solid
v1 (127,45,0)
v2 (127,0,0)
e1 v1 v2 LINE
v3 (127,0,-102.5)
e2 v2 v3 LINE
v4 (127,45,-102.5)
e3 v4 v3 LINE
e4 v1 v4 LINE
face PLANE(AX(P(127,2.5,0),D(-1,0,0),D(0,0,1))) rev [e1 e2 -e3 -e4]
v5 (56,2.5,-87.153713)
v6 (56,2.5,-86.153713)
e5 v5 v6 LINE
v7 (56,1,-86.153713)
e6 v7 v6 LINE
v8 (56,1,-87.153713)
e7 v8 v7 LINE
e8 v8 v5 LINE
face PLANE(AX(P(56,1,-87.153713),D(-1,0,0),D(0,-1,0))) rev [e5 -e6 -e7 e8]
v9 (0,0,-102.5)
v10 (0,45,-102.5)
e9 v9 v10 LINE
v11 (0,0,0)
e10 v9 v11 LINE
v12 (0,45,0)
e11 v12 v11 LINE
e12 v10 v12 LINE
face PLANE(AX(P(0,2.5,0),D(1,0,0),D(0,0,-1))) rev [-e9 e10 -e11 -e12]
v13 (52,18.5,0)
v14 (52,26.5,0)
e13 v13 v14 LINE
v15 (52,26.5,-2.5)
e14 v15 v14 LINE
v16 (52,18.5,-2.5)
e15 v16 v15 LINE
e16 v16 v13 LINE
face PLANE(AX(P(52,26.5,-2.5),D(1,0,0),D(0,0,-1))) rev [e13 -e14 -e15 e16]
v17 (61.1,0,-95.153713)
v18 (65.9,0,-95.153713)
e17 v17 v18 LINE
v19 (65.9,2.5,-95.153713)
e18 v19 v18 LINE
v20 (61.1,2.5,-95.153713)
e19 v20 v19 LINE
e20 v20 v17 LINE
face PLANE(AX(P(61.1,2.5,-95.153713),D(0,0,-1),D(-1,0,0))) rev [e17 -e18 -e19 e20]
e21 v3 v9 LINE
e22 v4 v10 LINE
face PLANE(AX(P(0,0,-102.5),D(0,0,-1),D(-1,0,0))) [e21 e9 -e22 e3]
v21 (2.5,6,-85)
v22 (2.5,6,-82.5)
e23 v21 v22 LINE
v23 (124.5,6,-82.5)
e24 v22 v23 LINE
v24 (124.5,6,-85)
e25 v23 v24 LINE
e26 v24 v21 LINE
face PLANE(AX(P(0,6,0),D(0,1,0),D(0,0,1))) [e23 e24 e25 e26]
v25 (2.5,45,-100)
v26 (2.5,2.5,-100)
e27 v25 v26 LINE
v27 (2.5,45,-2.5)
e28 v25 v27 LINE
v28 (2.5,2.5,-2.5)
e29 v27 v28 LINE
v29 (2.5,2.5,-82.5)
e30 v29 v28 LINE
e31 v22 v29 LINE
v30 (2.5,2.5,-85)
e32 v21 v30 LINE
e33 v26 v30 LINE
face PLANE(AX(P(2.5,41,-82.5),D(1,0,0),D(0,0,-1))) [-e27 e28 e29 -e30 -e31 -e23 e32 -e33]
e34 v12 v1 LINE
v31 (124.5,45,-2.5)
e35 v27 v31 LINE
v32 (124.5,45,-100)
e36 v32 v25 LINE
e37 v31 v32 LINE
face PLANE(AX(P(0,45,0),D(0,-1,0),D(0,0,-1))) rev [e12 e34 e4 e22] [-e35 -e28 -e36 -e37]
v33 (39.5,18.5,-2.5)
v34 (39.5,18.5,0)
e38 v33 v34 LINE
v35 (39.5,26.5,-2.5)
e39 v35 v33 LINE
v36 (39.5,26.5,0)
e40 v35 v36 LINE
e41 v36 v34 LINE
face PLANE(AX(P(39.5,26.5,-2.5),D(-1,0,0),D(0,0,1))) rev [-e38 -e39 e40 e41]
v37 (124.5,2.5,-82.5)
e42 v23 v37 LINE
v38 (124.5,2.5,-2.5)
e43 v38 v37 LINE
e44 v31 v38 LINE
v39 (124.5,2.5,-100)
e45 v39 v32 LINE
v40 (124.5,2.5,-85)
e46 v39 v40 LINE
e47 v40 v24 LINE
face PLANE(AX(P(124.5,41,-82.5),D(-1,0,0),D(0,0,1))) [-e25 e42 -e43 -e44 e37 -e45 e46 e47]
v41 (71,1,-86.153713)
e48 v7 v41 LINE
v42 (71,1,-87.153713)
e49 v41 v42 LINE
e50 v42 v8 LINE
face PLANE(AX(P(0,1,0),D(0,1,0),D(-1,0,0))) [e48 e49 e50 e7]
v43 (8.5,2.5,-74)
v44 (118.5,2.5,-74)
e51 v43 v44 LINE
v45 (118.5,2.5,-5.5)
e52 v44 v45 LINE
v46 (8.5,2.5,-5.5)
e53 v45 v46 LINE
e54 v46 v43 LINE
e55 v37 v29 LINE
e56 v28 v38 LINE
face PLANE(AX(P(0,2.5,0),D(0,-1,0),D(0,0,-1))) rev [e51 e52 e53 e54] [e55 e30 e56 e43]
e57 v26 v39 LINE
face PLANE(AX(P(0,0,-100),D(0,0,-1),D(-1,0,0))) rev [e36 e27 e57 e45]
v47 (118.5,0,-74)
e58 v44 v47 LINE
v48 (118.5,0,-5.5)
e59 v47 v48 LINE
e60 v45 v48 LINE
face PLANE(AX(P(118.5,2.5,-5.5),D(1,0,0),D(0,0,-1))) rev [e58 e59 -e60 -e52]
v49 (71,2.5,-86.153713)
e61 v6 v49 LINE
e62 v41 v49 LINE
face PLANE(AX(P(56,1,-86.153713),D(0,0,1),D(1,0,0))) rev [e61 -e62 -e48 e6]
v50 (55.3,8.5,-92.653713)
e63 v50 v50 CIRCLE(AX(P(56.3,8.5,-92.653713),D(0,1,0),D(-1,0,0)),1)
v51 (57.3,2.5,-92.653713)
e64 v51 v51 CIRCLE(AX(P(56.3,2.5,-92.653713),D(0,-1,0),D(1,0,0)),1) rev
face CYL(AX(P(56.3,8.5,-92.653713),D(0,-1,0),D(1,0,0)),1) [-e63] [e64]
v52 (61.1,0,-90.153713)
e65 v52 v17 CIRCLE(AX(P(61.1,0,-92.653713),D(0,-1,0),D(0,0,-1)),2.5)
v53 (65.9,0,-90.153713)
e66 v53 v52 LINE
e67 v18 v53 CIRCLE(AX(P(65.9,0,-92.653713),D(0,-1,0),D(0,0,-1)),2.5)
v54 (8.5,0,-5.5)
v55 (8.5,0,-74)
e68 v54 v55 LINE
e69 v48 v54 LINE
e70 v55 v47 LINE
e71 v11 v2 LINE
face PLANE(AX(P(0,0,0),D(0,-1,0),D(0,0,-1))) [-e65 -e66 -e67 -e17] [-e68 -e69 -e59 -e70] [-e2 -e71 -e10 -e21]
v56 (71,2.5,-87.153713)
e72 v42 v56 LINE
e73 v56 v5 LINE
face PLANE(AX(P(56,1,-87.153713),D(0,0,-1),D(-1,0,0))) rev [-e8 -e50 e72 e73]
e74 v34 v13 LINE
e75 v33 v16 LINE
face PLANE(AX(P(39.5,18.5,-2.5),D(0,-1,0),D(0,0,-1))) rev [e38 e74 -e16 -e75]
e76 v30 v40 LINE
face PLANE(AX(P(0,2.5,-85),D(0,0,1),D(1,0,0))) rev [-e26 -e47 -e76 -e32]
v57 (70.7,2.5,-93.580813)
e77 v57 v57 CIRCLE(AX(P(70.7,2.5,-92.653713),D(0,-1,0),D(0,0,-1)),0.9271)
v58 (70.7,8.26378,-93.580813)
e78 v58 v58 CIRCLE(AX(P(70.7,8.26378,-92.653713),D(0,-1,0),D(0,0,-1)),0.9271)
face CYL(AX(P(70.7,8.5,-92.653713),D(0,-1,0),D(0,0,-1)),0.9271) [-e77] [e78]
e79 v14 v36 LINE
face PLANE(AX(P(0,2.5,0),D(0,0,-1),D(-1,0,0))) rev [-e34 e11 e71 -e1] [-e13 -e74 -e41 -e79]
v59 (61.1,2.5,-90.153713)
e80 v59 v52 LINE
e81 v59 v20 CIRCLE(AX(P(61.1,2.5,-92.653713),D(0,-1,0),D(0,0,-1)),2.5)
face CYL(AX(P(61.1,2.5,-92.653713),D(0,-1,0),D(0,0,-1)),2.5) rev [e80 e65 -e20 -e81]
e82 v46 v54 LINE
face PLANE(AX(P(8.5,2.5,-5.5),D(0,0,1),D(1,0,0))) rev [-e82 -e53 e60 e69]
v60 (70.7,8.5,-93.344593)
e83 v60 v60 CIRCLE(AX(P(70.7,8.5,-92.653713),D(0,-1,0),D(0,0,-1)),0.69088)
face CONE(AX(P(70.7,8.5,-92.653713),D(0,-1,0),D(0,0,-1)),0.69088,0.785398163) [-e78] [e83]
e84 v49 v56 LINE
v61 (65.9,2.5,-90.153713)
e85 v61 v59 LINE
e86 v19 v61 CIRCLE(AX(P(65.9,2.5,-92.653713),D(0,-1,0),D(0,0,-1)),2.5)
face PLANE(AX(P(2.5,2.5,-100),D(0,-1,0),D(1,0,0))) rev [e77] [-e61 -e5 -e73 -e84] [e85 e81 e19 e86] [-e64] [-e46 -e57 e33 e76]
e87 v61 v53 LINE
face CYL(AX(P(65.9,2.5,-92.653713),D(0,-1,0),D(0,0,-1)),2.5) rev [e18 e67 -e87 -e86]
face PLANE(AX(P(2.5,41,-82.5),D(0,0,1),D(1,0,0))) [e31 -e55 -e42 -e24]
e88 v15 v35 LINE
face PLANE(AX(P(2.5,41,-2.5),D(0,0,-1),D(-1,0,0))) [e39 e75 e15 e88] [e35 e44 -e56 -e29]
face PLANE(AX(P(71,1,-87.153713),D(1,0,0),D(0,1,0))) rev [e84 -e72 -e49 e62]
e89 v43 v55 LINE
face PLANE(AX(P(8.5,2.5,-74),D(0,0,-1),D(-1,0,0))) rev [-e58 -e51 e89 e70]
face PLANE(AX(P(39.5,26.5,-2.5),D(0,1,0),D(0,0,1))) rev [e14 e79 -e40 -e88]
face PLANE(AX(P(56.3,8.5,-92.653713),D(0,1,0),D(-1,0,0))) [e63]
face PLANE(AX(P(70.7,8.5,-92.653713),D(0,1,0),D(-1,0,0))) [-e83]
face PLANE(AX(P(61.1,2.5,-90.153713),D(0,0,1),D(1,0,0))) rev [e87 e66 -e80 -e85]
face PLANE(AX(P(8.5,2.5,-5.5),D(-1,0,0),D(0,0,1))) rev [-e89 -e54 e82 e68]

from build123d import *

# Parameters (mm, degrees)
SKETCH1_W           = 127
SKETCH1_H           = 85
BOSS_EXTRUDE1_DEPTH = 2.5
SKETCH2_W           = 127
SKETCH2_H           = 85
SKETCH2_W_2         = 122
SKETCH2_H_2         = 80
BOSS_EXTRUDE2_DEPTH = 38.5
SKETCH3_W           = 110
SKETCH3_H           = 68.5
CUT_EXTRUDE1_DEPTH  = 2.5
BOSS_EXTRUDE3_DEPTH = 15
SKETCH10_W          = 122
SKETCH10_H          = 2.5
CUT_EXTRUDE2_DEPTH  = 35
SKETCH11_W          = 127
SKETCH11_H          = 41
BOSS_EXTRUDE4_DEPTH = 2.5
CUT_EXTRUDE4_DEPTH  = 2.5
SKETCH14_W          = 15
SKETCH14_H          = 1
CUT_EXTRUDE5_DEPTH  = 1.5
SKETCH13_R          = 1
BOSS_EXTRUDE6_DEPTH = 6
SKETCH17_W          = 12.5
SKETCH17_H          = 8
CUT_EXTRUDE6_DEPTH  = 2.5
SKETCH19_W          = 127
SKETCH19_H          = 102.5
SKETCH19_W_2        = 122
SKETCH19_H_2        = 97.5
BOSS_EXTRUDE7_DEPTH = 4


# Read off the part's stored shape, not the designer's step: #1-64 Machine Threads Stud1
with BuildPart() as part:
    # Sketch1 → Boss-Extrude1 (new body)
    with BuildSketch(Plane(origin=(0, 0, 0), x_dir=(1, 0, 0), z_dir=(0, 1, 0))):
        with Locations((63.5, 42.5)):
            Rectangle(SKETCH1_W, SKETCH1_H)
    extrude(amount=BOSS_EXTRUDE1_DEPTH)

    # Sketch2 → Boss-Extrude2 (add)
    with BuildSketch(Plane(origin=(0, 2.5, 0), x_dir=(1, 0, 0), z_dir=(0, 1, 0))):
        with Locations((63.5, 42.5)):
            Rectangle(SKETCH2_W, SKETCH2_H)
        with Locations((63.5, 42.5)):
            Rectangle(SKETCH2_W_2, SKETCH2_H_2, mode=Mode.SUBTRACT)
    extrude(amount=BOSS_EXTRUDE2_DEPTH)

    # Sketch3 → Cut-Extrude1 (cut)
    with BuildSketch(Plane(origin=(0, 0, 0), x_dir=(-1, 0, 0), z_dir=(0, -1, 0))):
        with Locations((-63.5, 39.75)):
            Rectangle(SKETCH3_W, SKETCH3_H)
    extrude(amount=-CUT_EXTRUDE1_DEPTH, mode=Mode.SUBTRACT)

    # Sketch9 → Boss-Extrude3 (add)
    with BuildSketch(Plane(origin=(0, 0, -85), x_dir=(-1, 0, 0), z_dir=(0, 0, -1))):
        Polygon((-127, 0), (0, 0), (0, 2.5), (0, 41), (-2.5, 41), (-2.5, 2.5), (-124.5, 2.5), (-124.5, 41), (-127, 41), (-127, 2.5), align=None)
    extrude(amount=BOSS_EXTRUDE3_DEPTH)

    # Sketch10 → Cut-Extrude2 (cut)
    with BuildSketch(Plane(origin=(0, 41, 0), x_dir=(1, 0, 0), z_dir=(0, 1, 0))):
        with Locations((63.5, 83.75)):
            Rectangle(SKETCH10_W, SKETCH10_H)
    extrude(amount=-CUT_EXTRUDE2_DEPTH, mode=Mode.SUBTRACT)

    # Sketch11 → Boss-Extrude4 (add)
    with BuildSketch(Plane(origin=(0, 0, -100), x_dir=(-1, 0, 0), z_dir=(0, 0, -1))):
        with Locations((-63.5, 20.5)):
            Rectangle(SKETCH11_W, SKETCH11_H)
    extrude(amount=BOSS_EXTRUDE4_DEPTH)

    # Sketch6 → Cut-Extrude4 (cut)
    with BuildSketch(Plane(origin=(0, 0, 0), x_dir=(-1, 0, 0), z_dir=(0, -1, 0))):
        with BuildLine():
            Line((-61.1, 90.153713072), (-65.9, 90.153713072))
            ThreePointArc((-65.9, 90.153713072), (-68.4, 92.653713072), (-65.9, 95.153713072))
            Line((-65.9, 95.153713072), (-61.1, 95.153713072))
            ThreePointArc((-61.1, 95.153713072), (-58.6, 92.653713072), (-61.1, 90.153713072))
        make_face()
    extrude(amount=-CUT_EXTRUDE4_DEPTH, mode=Mode.SUBTRACT)

    # Sketch14 → Cut-Extrude5 (cut)
    with BuildSketch(Plane(origin=(0, 2.5, 0), x_dir=(1, 0, 0), z_dir=(0, 1, 0))):
        with Locations((63.5, 86.653713072)):
            Rectangle(SKETCH14_W, SKETCH14_H)
    extrude(amount=-CUT_EXTRUDE5_DEPTH, mode=Mode.SUBTRACT)

    # Sketch13 → Boss-Extrude6 (add)
    with BuildSketch(Plane(origin=(0, 2.5, 0), x_dir=(1, 0, 0), z_dir=(0, 1, 0))):
        with Locations((56.3, 92.653713072)):
            Circle(SKETCH13_R)
        with Locations((70.7, 92.653713072)):
            Circle(SKETCH13_R)
    extrude(amount=BOSS_EXTRUDE6_DEPTH)

    # Sketch17 → Cut-Extrude6 (cut)
    with BuildSketch(Plane.XY):
        with Locations((45.75, 22.5)):
            Rectangle(SKETCH17_W, SKETCH17_H)
    extrude(amount=-CUT_EXTRUDE6_DEPTH, mode=Mode.SUBTRACT)

    # Sketch19 → Boss-Extrude7 (add)
    with BuildSketch(Plane(origin=(0, 41, 0), x_dir=(1, 0, 0), z_dir=(0, 1, 0))):
        with Locations((63.5, 51.25)):
            Rectangle(SKETCH19_W, SKETCH19_H)
        with Locations((63.5, 51.25)):
            Rectangle(SKETCH19_W_2, SKETCH19_H_2, mode=Mode.SUBTRACT)
    extrude(amount=BOSS_EXTRUDE7_DEPTH)

    # #1-64 Machine Threads Stud1 outline → #1-64 Machine Threads Stud1 (revolve, cut)
    with BuildSketch(Plane(origin=(70.7, 0, -92.653713072), x_dir=(1, 0, 0), z_dir=(0, 0, 1))):
        Polygon((1, 8.5), (0.69088, 8.5), (0.9271, 8.26378), (0.9271, 2.5), (1, 2.5), align=None)
    revolve(axis=Axis((70.7, 0, -92.653713072), (0, 1, 0)), mode=Mode.SUBTRACT)


solid = part.part
